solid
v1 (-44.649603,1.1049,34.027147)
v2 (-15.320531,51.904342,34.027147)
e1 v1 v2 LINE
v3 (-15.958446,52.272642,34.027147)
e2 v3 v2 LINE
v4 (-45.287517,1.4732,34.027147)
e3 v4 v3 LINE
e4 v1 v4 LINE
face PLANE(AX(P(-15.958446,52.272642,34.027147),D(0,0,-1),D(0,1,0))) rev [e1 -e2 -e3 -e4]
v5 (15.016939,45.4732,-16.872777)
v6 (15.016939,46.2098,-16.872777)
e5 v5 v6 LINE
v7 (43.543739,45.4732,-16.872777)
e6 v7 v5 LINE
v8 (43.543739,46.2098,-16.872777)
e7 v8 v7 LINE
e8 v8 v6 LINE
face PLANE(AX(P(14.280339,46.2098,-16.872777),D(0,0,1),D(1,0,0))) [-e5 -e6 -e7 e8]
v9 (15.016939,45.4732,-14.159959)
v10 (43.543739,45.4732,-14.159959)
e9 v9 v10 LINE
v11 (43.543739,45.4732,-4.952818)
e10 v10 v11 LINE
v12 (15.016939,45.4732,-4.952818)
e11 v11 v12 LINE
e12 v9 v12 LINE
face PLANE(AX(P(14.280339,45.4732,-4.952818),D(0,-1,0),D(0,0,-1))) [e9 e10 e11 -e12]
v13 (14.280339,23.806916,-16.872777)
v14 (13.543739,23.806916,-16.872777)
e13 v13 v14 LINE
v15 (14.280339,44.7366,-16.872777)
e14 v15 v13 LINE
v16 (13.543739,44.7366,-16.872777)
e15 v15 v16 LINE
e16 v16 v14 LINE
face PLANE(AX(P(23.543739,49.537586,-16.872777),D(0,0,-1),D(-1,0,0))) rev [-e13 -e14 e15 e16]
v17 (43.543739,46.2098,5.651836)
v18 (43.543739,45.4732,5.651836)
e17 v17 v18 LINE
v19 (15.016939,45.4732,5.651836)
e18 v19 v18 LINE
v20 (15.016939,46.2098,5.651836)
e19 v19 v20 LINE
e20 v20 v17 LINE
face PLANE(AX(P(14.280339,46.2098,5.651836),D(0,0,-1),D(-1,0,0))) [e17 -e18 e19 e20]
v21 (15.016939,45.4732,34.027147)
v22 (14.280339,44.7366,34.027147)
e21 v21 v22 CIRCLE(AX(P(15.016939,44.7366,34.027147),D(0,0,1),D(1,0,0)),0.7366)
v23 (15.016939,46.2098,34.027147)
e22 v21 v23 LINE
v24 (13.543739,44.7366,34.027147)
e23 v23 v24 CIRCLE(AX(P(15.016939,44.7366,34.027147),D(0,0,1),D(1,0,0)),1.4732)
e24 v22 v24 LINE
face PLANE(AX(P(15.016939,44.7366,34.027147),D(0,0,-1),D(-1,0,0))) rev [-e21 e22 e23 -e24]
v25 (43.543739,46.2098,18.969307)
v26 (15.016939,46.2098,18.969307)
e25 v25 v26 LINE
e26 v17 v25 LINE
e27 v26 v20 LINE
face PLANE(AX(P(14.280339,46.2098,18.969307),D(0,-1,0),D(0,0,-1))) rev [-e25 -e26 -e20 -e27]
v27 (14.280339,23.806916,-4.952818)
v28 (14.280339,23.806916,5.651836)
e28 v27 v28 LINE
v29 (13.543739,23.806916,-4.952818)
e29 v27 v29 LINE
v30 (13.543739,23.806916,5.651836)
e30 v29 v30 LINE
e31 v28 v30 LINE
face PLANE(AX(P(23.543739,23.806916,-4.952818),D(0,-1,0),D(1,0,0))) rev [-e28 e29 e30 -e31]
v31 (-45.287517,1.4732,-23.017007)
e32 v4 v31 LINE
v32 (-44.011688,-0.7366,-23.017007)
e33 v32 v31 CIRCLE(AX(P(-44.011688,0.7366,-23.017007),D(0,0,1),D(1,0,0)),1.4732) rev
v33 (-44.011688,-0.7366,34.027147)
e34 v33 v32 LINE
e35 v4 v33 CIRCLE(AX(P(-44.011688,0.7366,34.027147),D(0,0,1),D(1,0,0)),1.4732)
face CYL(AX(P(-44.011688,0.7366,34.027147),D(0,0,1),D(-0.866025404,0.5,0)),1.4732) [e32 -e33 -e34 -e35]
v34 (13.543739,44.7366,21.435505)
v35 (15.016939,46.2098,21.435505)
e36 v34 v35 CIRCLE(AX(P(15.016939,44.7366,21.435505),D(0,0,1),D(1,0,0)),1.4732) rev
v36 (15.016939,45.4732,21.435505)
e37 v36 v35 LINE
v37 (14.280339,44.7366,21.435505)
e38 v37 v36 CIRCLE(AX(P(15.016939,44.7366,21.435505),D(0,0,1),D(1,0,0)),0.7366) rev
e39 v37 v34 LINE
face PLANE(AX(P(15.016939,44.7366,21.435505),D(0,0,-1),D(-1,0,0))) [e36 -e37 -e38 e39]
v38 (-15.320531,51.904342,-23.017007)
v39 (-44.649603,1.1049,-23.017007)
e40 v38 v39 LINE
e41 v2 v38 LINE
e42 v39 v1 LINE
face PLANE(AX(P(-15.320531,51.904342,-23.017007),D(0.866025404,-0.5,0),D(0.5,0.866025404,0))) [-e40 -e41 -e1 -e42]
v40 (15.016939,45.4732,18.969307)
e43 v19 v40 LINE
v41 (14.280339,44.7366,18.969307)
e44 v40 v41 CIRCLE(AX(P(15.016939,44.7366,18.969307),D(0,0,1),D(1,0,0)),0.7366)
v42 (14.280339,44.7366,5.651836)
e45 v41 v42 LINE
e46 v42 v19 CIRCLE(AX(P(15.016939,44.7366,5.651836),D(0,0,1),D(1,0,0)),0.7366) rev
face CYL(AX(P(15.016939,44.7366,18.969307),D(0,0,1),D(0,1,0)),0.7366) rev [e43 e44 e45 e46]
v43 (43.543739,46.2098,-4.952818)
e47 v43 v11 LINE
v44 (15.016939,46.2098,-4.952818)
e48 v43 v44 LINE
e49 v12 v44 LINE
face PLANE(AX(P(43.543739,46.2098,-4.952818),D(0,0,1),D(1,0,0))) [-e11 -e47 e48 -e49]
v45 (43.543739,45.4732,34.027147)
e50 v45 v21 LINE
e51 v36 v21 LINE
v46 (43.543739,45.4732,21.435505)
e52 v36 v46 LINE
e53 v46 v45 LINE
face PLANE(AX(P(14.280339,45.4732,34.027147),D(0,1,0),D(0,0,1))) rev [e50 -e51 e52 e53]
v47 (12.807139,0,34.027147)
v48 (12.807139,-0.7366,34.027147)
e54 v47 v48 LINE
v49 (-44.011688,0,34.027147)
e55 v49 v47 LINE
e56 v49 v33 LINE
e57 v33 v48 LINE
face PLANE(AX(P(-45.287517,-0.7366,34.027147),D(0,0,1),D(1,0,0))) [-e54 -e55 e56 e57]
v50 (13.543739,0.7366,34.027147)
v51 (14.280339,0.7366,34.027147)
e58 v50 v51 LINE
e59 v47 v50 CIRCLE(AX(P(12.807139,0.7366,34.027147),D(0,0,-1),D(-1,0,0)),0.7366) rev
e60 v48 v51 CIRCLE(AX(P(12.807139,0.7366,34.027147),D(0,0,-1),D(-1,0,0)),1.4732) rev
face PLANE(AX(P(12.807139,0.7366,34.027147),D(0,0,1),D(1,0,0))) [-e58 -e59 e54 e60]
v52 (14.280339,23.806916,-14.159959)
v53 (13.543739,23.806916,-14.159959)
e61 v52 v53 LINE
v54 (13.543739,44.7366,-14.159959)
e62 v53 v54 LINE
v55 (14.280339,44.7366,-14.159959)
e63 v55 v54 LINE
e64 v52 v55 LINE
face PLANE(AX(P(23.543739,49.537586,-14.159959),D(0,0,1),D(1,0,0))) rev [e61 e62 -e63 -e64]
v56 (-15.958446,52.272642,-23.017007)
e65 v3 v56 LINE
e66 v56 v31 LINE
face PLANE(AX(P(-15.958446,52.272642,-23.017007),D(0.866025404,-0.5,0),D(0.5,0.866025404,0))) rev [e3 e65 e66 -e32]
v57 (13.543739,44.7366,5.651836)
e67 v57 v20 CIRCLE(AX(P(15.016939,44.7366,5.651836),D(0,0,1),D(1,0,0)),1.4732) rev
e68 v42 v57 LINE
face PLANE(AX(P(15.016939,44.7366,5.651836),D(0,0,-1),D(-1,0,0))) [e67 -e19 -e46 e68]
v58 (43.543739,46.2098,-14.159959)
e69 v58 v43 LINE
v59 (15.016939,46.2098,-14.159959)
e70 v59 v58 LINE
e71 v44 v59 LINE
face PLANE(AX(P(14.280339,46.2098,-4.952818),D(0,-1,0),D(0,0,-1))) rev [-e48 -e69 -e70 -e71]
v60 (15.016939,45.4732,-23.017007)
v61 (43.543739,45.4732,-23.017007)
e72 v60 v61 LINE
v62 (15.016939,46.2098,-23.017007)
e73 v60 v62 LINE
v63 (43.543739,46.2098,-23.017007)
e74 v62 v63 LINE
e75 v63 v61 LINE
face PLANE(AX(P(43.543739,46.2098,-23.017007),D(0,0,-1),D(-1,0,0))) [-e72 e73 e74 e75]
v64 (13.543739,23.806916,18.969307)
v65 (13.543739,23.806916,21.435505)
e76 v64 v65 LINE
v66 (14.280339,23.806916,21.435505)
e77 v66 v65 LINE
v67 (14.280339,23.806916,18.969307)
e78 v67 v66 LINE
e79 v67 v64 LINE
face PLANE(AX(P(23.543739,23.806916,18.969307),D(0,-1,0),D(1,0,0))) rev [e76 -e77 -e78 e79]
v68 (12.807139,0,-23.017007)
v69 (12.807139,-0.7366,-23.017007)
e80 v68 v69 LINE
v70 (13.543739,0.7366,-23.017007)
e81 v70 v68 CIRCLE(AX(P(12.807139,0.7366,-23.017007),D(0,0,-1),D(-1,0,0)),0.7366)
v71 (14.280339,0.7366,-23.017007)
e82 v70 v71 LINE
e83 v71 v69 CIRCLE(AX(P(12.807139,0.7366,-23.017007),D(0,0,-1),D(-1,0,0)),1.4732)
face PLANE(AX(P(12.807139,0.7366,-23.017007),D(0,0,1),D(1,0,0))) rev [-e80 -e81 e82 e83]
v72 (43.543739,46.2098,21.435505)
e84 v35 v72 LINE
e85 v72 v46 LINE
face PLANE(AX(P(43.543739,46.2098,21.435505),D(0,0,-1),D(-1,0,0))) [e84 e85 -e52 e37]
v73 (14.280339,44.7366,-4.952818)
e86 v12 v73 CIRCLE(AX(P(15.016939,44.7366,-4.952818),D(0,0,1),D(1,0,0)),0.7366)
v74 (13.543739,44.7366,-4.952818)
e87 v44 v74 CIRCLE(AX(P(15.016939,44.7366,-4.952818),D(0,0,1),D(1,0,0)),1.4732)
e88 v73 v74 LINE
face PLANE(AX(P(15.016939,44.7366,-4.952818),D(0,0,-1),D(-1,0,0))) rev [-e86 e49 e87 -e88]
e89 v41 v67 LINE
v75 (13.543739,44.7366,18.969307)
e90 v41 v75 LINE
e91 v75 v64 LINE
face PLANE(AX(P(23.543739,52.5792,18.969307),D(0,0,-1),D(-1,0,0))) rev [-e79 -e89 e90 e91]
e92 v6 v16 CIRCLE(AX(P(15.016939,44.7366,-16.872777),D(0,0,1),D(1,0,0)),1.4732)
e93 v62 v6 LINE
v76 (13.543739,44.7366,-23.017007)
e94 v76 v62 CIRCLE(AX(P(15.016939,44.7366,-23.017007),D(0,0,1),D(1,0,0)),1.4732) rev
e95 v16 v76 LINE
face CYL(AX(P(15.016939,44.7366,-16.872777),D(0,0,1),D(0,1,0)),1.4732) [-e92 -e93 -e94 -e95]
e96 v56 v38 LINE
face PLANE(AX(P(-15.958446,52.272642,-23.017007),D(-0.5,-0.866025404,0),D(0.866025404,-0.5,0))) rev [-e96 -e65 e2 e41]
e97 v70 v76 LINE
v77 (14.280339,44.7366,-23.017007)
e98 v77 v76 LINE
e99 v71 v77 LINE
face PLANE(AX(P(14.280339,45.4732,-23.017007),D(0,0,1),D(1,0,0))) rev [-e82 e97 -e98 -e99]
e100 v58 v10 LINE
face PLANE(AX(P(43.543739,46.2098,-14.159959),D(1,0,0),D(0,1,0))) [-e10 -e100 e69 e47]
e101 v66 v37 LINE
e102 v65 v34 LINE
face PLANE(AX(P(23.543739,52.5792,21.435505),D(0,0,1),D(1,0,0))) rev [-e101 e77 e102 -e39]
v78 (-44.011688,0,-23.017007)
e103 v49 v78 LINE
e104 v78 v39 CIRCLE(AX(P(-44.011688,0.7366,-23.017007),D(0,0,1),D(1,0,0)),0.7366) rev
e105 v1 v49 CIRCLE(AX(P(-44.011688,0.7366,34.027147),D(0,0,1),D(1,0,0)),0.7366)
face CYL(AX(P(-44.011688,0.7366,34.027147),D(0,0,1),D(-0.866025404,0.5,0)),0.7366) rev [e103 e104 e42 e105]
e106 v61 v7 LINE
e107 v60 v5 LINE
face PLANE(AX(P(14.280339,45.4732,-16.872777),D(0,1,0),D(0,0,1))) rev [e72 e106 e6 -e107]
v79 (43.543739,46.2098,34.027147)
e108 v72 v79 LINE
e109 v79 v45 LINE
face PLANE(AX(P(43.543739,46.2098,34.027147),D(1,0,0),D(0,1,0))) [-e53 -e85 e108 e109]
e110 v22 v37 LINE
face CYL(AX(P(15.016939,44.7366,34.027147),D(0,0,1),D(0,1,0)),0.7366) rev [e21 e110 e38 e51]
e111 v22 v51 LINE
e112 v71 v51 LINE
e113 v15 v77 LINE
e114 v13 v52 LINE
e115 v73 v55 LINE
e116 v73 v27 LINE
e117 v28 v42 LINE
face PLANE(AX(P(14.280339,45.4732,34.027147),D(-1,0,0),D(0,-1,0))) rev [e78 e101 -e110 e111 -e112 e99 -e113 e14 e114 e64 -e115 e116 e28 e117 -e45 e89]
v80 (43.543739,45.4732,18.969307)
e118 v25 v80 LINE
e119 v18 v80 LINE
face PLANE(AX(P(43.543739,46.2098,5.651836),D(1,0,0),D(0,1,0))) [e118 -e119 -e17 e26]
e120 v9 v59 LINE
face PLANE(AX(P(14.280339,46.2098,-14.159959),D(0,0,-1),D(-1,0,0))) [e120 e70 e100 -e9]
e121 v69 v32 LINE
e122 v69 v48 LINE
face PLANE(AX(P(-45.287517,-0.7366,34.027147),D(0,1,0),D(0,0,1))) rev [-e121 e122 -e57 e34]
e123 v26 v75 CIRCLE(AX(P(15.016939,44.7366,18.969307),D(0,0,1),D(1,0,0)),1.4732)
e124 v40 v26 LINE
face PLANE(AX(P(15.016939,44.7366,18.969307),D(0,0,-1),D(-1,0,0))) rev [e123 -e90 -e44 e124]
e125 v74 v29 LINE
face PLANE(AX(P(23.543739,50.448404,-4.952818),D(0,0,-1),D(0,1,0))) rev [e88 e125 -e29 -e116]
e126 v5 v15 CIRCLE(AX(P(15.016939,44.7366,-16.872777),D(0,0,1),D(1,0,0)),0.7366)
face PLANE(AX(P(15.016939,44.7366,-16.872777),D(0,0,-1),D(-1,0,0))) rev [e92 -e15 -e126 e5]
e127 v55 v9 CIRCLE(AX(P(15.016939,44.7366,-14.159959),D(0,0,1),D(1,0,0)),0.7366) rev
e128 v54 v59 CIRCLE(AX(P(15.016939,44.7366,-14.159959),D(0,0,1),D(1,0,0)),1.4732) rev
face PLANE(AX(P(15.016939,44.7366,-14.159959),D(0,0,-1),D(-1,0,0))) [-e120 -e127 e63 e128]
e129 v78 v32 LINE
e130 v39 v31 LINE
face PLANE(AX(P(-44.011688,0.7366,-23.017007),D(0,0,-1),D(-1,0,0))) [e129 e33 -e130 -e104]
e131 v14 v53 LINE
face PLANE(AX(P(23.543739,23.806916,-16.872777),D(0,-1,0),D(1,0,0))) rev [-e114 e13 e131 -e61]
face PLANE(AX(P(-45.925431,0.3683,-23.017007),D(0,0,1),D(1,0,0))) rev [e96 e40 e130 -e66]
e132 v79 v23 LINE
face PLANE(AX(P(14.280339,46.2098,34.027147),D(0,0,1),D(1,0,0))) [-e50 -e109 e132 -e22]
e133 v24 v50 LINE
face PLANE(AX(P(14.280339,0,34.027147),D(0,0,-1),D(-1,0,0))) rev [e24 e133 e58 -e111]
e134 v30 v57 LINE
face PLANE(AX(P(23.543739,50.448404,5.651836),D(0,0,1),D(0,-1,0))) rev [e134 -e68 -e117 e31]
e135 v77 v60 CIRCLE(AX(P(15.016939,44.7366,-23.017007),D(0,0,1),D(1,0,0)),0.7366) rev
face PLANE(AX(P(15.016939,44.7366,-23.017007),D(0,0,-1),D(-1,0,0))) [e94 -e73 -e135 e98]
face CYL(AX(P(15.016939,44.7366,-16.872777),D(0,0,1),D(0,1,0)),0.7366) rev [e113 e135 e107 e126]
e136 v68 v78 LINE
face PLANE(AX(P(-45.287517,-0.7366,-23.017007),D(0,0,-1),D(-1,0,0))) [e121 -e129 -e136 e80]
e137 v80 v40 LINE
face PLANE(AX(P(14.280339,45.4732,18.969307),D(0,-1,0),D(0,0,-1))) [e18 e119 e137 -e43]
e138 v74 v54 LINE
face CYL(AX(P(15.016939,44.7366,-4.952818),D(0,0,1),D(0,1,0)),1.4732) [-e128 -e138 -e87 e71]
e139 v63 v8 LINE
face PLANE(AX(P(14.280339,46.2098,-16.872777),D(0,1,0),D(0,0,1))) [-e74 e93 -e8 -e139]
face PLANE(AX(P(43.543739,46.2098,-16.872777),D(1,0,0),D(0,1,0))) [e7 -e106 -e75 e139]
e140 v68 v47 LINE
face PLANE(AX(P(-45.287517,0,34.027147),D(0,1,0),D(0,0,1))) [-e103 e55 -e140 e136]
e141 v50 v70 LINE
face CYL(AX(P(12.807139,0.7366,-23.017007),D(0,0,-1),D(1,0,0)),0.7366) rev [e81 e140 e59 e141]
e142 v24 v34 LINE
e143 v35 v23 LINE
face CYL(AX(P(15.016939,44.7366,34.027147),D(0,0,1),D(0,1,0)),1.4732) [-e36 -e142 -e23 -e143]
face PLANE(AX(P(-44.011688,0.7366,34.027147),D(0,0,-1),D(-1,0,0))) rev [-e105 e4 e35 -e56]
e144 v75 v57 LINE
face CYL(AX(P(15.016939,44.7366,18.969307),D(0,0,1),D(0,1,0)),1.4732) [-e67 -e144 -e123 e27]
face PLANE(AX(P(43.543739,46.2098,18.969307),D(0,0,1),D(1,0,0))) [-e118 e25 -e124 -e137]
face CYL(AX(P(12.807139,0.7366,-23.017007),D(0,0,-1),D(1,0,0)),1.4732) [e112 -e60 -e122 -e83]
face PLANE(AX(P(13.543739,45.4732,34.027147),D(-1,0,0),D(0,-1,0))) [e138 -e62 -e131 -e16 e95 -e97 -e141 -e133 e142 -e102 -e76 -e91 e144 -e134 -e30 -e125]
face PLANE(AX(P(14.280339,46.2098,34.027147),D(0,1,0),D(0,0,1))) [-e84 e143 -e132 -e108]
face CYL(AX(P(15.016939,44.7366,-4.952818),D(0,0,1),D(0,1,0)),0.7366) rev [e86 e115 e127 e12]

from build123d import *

# Parameters (mm, degrees)
SKETCH1_W                      = 58.831256187
SKETCH1_H                      = 57.04415391
BASE_FLANGE1_DEPTH             = 0.7366
EDGE_FLANGE1_STRIP_W           = 4.4196
EDGE_FLANGE1_STRIP_H           = 0.7366
EDGE_FLANGE1_STRIP_CUT_DEPTH   = 57.044153909
EDGE_FLANGE1_DEPTH             = 57.044153909
SKETCH7_W                      = 2.712818276
SKETCH7_H                      = 25.730670316
SKETCH7_W_2                    = 10.604653262
SKETCH7_H_2                    = 26.641488396
SKETCH7_W_3                    = 2.466198433
SKETCH7_H_3                    = 28.772283842
CUT_EXTRUDE1_DEPTH             = 10
EDGE_FLANGE2_STRIP_CUT_DEPTH   = 57.044153909
EDGE_FLANGE2_DEPTH             = 57.044153909
EDGE_FLANGE3_STRIP_W           = 4.4196
EDGE_FLANGE3_STRIP_H           = 0.7366
EDGE_FLANGE3_STRIP_CUT_DEPTH   = 6.14423041
EDGE_FLANGE3_STRIP_2_W         = 4.4196
EDGE_FLANGE3_STRIP_2_H         = 0.7366
EDGE_FLANGE3_STRIP_CUT_2_DEPTH = 9.207140816
EDGE_FLANGE3_STRIP_3_W         = 4.4196
EDGE_FLANGE3_STRIP_3_H         = 0.7366
EDGE_FLANGE3_STRIP_CUT_3_DEPTH = 13.317471538
EDGE_FLANGE3_STRIP_4_W         = 4.4196
EDGE_FLANGE3_STRIP_4_H         = 0.7366
EDGE_FLANGE3_STRIP_CUT_4_DEPTH = 12.591641176
EDGE_FLANGE3_DEPTH             = 6.14423041
EDGE_FLANGE3_BEND_DEPTH        = 9.207140816
EDGE_FLANGE3_BEND_2_DEPTH      = 13.317471538
EDGE_FLANGE3_BEND_3_DEPTH      = 12.591641176


# Sheet-metal steps are written as plain solids
with BuildPart() as part:
    # Sketch1 → Base-Flange1 (new body)
    with BuildSketch(Plane(origin=(0, 0, 0), x_dir=(1, 0, 0), z_dir=(0, 1, 0))):
        with Locations((-15.871888874, -5.505069705)):
            Rectangle(SKETCH1_W, SKETCH1_H)
    extrude(amount=-BASE_FLANGE1_DEPTH)

    # Edge-Flange1 strip (across the edge) → Edge-Flange1 strip cut (cut)
    with BuildSketch(Plane(origin=(13.54373922, 0, 34.02714666), x_dir=(-1, 0, 0), z_dir=(0, 0, -1))):
        with Locations((-1.4732, -0.3683)):
            Rectangle(EDGE_FLANGE1_STRIP_W, EDGE_FLANGE1_STRIP_H)
    extrude(amount=EDGE_FLANGE1_STRIP_CUT_DEPTH, mode=Mode.SUBTRACT)

    # Edge-Flange1 section (across the edge) → Edge-Flange1 (add)
    with BuildSketch(Plane(origin=(13.54373922, 0, 34.02714666), x_dir=(-1, 0, 0), z_dir=(0, 0, -1))):
        with BuildLine():
            Line((-0.7366, 0.7366), (-0.7366, 45.4732))
            Line((-0.7366, 45.4732), (0, 45.4732))
            Line((0, 45.4732), (0, 0.7366))
            ThreePointArc((0, 0.7366), (0.215745145, 0.215745145), (0.7366, 0))
            Line((0.7366, 0), (0.7366, -0.7366))
            ThreePointArc((0.7366, -0.7366), (-0.30510971, -0.30510971), (-0.7366, 0.7366))
        make_face()
    extrude(amount=EDGE_FLANGE1_DEPTH)

    # Sketch7 → Cut-Extrude1 (cut)
    with BuildSketch(Plane.ZY.offset(-13.54373922)):
        with Locations((-15.516367702, 36.672250911)):
            Rectangle(SKETCH7_W, SKETCH7_H)
        with Locations((0.349508883, 37.127659951)):
            Rectangle(SKETCH7_W_2, SKETCH7_H_2)
        with Locations((20.202406268, 38.193057674)):
            Rectangle(SKETCH7_W_3, SKETCH7_H_3)
    extrude(amount=-CUT_EXTRUDE1_DEPTH, mode=Mode.SUBTRACT)

    # Edge-Flange2 strip (across the edge) → Edge-Flange2 strip cut (cut)
    with BuildSketch(Plane(origin=(-45.287516967, 0, -23.01700725), x_dir=(0.8660254037844398, -0.499999999999998, 0), z_dir=(0, 0, 1))):
        Polygon((-5.1562, -3.827485875), (1.4732, 0), (1.1049, 0.637914312), (-5.5245, -3.189571562), align=None)
    extrude(amount=EDGE_FLANGE2_STRIP_CUT_DEPTH, mode=Mode.SUBTRACT)

    # Edge-Flange2 section (across the edge) → Edge-Flange2 (add)
    with BuildSketch(Plane(origin=(-45.287516967, 0, -23.01700725), x_dir=(0.8660254037844398, -0.499999999999998, 0), z_dir=(0, 0, 1))):
        with BuildLine():
            Line((-0.7366, 1.275828625), (-0.7366, 59.933971375))
            Line((-0.7366, 59.933971375), (0, 59.933971375))
            Line((0, 59.933971375), (0, 1.275828625))
            ThreePointArc((0, 1.275828625), (0.3683, 0.637914312), (1.1049, 0.637914312))
            Line((1.1049, 0.637914312), (1.4732, 0))
            ThreePointArc((1.4732, 0), (0, 0), (-0.7366, 1.275828625))
        make_face()
    extrude(amount=EDGE_FLANGE2_DEPTH)

    # Edge-Flange3 strip (across the edge) → Edge-Flange3 strip cut (cut)
    with BuildSketch(Plane(origin=(14.28033922, 45.4732, -23.01700725), x_dir=(0, -1, 0), z_dir=(0, 0, 1))):
        with Locations((-1.4732, -0.3683)):
            Rectangle(EDGE_FLANGE3_STRIP_W, EDGE_FLANGE3_STRIP_H)
    extrude(amount=EDGE_FLANGE3_STRIP_CUT_DEPTH, mode=Mode.SUBTRACT)

    # Edge-Flange3 strip 2 (across the edge) → Edge-Flange3 strip cut 2 (cut)
    with BuildSketch(Plane(origin=(14.28033922, 45.4732, -14.159958564), x_dir=(0, -1, 0), z_dir=(0, 0, 1))):
        with Locations((-1.4732, -0.3683)):
            Rectangle(EDGE_FLANGE3_STRIP_2_W, EDGE_FLANGE3_STRIP_2_H)
    extrude(amount=EDGE_FLANGE3_STRIP_CUT_2_DEPTH, mode=Mode.SUBTRACT)

    # Edge-Flange3 strip 3 (across the edge) → Edge-Flange3 strip cut 3 (cut)
    with BuildSketch(Plane(origin=(14.28033922, 45.4732, 5.651835514), x_dir=(0, -1, 0), z_dir=(0, 0, 1))):
        with Locations((-1.4732, -0.3683)):
            Rectangle(EDGE_FLANGE3_STRIP_3_W, EDGE_FLANGE3_STRIP_3_H)
    extrude(amount=EDGE_FLANGE3_STRIP_CUT_3_DEPTH, mode=Mode.SUBTRACT)

    # Edge-Flange3 strip 4 (across the edge) → Edge-Flange3 strip cut 4 (cut)
    with BuildSketch(Plane(origin=(14.28033922, 45.4732, 21.435505484), x_dir=(0, -1, 0), z_dir=(0, 0, 1))):
        with Locations((-1.4732, -0.3683)):
            Rectangle(EDGE_FLANGE3_STRIP_4_W, EDGE_FLANGE3_STRIP_4_H)
    extrude(amount=EDGE_FLANGE3_STRIP_CUT_4_DEPTH, mode=Mode.SUBTRACT)

    # Edge-Flange3 section (across the edge) → Edge-Flange3 (add)
    with BuildSketch(Plane(origin=(14.28033922, 45.4732, -23.01700725), x_dir=(0, -1, 0), z_dir=(0, 0, 1))):
        with BuildLine():
            Line((-0.7366, 0.7366), (-0.7366, 29.2634))
            Line((-0.7366, 29.2634), (0, 29.2634))
            Line((0, 29.2634), (0, 0.7366))
            ThreePointArc((0, 0.7366), (0.215745145, 0.215745145), (0.7366, 0))
            Line((0.7366, 0), (0.7366, -0.7366))
            ThreePointArc((0.7366, -0.7366), (-0.30510971, -0.30510971), (-0.7366, 0.7366))
        make_face()
    extrude(amount=EDGE_FLANGE3_DEPTH)

    # Edge-Flange3 section 2 (across the edge) → Edge-Flange3 bend (add)
    with BuildSketch(Plane(origin=(14.28033922, 45.4732, -14.159958564), x_dir=(0, -1, 0), z_dir=(0, 0, 1))):
        with BuildLine():
            Line((-0.7366, 0.7366), (-0.7366, 29.2634))
            Line((-0.7366, 29.2634), (0, 29.2634))
            Line((0, 29.2634), (0, 0.7366))
            ThreePointArc((0, 0.7366), (0.215745145, 0.215745145), (0.7366, 0))
            Line((0.7366, 0), (0.7366, -0.7366))
            ThreePointArc((0.7366, -0.7366), (-0.30510971, -0.30510971), (-0.7366, 0.7366))
        make_face()
    extrude(amount=EDGE_FLANGE3_BEND_DEPTH)

    # Edge-Flange3 section 3 (across the edge) → Edge-Flange3 bend 2 (add)
    with BuildSketch(Plane(origin=(14.28033922, 45.4732, 5.651835514), x_dir=(0, -1, 0), z_dir=(0, 0, 1))):
        with BuildLine():
            Line((-0.7366, 0.7366), (-0.7366, 29.2634))
            Line((-0.7366, 29.2634), (0, 29.2634))
            Line((0, 29.2634), (0, 0.7366))
            ThreePointArc((0, 0.7366), (0.215745145, 0.215745145), (0.7366, 0))
            Line((0.7366, 0), (0.7366, -0.7366))
            ThreePointArc((0.7366, -0.7366), (-0.30510971, -0.30510971), (-0.7366, 0.7366))
        make_face()
    extrude(amount=EDGE_FLANGE3_BEND_2_DEPTH)

    # Edge-Flange3 section 4 (across the edge) → Edge-Flange3 bend 3 (add)
    with BuildSketch(Plane(origin=(14.28033922, 45.4732, 21.435505484), x_dir=(0, -1, 0), z_dir=(0, 0, 1))):
        with BuildLine():
            Line((-0.7366, 0.7366), (-0.7366, 29.2634))
            Line((-0.7366, 29.2634), (0, 29.2634))
            Line((0, 29.2634), (0, 0.7366))
            ThreePointArc((0, 0.7366), (0.215745145, 0.215745145), (0.7366, 0))
            Line((0.7366, 0), (0.7366, -0.7366))
            ThreePointArc((0.7366, -0.7366), (-0.30510971, -0.30510971), (-0.7366, 0.7366))
        make_face()
    extrude(amount=EDGE_FLANGE3_BEND_3_DEPTH)


solid = part.part
